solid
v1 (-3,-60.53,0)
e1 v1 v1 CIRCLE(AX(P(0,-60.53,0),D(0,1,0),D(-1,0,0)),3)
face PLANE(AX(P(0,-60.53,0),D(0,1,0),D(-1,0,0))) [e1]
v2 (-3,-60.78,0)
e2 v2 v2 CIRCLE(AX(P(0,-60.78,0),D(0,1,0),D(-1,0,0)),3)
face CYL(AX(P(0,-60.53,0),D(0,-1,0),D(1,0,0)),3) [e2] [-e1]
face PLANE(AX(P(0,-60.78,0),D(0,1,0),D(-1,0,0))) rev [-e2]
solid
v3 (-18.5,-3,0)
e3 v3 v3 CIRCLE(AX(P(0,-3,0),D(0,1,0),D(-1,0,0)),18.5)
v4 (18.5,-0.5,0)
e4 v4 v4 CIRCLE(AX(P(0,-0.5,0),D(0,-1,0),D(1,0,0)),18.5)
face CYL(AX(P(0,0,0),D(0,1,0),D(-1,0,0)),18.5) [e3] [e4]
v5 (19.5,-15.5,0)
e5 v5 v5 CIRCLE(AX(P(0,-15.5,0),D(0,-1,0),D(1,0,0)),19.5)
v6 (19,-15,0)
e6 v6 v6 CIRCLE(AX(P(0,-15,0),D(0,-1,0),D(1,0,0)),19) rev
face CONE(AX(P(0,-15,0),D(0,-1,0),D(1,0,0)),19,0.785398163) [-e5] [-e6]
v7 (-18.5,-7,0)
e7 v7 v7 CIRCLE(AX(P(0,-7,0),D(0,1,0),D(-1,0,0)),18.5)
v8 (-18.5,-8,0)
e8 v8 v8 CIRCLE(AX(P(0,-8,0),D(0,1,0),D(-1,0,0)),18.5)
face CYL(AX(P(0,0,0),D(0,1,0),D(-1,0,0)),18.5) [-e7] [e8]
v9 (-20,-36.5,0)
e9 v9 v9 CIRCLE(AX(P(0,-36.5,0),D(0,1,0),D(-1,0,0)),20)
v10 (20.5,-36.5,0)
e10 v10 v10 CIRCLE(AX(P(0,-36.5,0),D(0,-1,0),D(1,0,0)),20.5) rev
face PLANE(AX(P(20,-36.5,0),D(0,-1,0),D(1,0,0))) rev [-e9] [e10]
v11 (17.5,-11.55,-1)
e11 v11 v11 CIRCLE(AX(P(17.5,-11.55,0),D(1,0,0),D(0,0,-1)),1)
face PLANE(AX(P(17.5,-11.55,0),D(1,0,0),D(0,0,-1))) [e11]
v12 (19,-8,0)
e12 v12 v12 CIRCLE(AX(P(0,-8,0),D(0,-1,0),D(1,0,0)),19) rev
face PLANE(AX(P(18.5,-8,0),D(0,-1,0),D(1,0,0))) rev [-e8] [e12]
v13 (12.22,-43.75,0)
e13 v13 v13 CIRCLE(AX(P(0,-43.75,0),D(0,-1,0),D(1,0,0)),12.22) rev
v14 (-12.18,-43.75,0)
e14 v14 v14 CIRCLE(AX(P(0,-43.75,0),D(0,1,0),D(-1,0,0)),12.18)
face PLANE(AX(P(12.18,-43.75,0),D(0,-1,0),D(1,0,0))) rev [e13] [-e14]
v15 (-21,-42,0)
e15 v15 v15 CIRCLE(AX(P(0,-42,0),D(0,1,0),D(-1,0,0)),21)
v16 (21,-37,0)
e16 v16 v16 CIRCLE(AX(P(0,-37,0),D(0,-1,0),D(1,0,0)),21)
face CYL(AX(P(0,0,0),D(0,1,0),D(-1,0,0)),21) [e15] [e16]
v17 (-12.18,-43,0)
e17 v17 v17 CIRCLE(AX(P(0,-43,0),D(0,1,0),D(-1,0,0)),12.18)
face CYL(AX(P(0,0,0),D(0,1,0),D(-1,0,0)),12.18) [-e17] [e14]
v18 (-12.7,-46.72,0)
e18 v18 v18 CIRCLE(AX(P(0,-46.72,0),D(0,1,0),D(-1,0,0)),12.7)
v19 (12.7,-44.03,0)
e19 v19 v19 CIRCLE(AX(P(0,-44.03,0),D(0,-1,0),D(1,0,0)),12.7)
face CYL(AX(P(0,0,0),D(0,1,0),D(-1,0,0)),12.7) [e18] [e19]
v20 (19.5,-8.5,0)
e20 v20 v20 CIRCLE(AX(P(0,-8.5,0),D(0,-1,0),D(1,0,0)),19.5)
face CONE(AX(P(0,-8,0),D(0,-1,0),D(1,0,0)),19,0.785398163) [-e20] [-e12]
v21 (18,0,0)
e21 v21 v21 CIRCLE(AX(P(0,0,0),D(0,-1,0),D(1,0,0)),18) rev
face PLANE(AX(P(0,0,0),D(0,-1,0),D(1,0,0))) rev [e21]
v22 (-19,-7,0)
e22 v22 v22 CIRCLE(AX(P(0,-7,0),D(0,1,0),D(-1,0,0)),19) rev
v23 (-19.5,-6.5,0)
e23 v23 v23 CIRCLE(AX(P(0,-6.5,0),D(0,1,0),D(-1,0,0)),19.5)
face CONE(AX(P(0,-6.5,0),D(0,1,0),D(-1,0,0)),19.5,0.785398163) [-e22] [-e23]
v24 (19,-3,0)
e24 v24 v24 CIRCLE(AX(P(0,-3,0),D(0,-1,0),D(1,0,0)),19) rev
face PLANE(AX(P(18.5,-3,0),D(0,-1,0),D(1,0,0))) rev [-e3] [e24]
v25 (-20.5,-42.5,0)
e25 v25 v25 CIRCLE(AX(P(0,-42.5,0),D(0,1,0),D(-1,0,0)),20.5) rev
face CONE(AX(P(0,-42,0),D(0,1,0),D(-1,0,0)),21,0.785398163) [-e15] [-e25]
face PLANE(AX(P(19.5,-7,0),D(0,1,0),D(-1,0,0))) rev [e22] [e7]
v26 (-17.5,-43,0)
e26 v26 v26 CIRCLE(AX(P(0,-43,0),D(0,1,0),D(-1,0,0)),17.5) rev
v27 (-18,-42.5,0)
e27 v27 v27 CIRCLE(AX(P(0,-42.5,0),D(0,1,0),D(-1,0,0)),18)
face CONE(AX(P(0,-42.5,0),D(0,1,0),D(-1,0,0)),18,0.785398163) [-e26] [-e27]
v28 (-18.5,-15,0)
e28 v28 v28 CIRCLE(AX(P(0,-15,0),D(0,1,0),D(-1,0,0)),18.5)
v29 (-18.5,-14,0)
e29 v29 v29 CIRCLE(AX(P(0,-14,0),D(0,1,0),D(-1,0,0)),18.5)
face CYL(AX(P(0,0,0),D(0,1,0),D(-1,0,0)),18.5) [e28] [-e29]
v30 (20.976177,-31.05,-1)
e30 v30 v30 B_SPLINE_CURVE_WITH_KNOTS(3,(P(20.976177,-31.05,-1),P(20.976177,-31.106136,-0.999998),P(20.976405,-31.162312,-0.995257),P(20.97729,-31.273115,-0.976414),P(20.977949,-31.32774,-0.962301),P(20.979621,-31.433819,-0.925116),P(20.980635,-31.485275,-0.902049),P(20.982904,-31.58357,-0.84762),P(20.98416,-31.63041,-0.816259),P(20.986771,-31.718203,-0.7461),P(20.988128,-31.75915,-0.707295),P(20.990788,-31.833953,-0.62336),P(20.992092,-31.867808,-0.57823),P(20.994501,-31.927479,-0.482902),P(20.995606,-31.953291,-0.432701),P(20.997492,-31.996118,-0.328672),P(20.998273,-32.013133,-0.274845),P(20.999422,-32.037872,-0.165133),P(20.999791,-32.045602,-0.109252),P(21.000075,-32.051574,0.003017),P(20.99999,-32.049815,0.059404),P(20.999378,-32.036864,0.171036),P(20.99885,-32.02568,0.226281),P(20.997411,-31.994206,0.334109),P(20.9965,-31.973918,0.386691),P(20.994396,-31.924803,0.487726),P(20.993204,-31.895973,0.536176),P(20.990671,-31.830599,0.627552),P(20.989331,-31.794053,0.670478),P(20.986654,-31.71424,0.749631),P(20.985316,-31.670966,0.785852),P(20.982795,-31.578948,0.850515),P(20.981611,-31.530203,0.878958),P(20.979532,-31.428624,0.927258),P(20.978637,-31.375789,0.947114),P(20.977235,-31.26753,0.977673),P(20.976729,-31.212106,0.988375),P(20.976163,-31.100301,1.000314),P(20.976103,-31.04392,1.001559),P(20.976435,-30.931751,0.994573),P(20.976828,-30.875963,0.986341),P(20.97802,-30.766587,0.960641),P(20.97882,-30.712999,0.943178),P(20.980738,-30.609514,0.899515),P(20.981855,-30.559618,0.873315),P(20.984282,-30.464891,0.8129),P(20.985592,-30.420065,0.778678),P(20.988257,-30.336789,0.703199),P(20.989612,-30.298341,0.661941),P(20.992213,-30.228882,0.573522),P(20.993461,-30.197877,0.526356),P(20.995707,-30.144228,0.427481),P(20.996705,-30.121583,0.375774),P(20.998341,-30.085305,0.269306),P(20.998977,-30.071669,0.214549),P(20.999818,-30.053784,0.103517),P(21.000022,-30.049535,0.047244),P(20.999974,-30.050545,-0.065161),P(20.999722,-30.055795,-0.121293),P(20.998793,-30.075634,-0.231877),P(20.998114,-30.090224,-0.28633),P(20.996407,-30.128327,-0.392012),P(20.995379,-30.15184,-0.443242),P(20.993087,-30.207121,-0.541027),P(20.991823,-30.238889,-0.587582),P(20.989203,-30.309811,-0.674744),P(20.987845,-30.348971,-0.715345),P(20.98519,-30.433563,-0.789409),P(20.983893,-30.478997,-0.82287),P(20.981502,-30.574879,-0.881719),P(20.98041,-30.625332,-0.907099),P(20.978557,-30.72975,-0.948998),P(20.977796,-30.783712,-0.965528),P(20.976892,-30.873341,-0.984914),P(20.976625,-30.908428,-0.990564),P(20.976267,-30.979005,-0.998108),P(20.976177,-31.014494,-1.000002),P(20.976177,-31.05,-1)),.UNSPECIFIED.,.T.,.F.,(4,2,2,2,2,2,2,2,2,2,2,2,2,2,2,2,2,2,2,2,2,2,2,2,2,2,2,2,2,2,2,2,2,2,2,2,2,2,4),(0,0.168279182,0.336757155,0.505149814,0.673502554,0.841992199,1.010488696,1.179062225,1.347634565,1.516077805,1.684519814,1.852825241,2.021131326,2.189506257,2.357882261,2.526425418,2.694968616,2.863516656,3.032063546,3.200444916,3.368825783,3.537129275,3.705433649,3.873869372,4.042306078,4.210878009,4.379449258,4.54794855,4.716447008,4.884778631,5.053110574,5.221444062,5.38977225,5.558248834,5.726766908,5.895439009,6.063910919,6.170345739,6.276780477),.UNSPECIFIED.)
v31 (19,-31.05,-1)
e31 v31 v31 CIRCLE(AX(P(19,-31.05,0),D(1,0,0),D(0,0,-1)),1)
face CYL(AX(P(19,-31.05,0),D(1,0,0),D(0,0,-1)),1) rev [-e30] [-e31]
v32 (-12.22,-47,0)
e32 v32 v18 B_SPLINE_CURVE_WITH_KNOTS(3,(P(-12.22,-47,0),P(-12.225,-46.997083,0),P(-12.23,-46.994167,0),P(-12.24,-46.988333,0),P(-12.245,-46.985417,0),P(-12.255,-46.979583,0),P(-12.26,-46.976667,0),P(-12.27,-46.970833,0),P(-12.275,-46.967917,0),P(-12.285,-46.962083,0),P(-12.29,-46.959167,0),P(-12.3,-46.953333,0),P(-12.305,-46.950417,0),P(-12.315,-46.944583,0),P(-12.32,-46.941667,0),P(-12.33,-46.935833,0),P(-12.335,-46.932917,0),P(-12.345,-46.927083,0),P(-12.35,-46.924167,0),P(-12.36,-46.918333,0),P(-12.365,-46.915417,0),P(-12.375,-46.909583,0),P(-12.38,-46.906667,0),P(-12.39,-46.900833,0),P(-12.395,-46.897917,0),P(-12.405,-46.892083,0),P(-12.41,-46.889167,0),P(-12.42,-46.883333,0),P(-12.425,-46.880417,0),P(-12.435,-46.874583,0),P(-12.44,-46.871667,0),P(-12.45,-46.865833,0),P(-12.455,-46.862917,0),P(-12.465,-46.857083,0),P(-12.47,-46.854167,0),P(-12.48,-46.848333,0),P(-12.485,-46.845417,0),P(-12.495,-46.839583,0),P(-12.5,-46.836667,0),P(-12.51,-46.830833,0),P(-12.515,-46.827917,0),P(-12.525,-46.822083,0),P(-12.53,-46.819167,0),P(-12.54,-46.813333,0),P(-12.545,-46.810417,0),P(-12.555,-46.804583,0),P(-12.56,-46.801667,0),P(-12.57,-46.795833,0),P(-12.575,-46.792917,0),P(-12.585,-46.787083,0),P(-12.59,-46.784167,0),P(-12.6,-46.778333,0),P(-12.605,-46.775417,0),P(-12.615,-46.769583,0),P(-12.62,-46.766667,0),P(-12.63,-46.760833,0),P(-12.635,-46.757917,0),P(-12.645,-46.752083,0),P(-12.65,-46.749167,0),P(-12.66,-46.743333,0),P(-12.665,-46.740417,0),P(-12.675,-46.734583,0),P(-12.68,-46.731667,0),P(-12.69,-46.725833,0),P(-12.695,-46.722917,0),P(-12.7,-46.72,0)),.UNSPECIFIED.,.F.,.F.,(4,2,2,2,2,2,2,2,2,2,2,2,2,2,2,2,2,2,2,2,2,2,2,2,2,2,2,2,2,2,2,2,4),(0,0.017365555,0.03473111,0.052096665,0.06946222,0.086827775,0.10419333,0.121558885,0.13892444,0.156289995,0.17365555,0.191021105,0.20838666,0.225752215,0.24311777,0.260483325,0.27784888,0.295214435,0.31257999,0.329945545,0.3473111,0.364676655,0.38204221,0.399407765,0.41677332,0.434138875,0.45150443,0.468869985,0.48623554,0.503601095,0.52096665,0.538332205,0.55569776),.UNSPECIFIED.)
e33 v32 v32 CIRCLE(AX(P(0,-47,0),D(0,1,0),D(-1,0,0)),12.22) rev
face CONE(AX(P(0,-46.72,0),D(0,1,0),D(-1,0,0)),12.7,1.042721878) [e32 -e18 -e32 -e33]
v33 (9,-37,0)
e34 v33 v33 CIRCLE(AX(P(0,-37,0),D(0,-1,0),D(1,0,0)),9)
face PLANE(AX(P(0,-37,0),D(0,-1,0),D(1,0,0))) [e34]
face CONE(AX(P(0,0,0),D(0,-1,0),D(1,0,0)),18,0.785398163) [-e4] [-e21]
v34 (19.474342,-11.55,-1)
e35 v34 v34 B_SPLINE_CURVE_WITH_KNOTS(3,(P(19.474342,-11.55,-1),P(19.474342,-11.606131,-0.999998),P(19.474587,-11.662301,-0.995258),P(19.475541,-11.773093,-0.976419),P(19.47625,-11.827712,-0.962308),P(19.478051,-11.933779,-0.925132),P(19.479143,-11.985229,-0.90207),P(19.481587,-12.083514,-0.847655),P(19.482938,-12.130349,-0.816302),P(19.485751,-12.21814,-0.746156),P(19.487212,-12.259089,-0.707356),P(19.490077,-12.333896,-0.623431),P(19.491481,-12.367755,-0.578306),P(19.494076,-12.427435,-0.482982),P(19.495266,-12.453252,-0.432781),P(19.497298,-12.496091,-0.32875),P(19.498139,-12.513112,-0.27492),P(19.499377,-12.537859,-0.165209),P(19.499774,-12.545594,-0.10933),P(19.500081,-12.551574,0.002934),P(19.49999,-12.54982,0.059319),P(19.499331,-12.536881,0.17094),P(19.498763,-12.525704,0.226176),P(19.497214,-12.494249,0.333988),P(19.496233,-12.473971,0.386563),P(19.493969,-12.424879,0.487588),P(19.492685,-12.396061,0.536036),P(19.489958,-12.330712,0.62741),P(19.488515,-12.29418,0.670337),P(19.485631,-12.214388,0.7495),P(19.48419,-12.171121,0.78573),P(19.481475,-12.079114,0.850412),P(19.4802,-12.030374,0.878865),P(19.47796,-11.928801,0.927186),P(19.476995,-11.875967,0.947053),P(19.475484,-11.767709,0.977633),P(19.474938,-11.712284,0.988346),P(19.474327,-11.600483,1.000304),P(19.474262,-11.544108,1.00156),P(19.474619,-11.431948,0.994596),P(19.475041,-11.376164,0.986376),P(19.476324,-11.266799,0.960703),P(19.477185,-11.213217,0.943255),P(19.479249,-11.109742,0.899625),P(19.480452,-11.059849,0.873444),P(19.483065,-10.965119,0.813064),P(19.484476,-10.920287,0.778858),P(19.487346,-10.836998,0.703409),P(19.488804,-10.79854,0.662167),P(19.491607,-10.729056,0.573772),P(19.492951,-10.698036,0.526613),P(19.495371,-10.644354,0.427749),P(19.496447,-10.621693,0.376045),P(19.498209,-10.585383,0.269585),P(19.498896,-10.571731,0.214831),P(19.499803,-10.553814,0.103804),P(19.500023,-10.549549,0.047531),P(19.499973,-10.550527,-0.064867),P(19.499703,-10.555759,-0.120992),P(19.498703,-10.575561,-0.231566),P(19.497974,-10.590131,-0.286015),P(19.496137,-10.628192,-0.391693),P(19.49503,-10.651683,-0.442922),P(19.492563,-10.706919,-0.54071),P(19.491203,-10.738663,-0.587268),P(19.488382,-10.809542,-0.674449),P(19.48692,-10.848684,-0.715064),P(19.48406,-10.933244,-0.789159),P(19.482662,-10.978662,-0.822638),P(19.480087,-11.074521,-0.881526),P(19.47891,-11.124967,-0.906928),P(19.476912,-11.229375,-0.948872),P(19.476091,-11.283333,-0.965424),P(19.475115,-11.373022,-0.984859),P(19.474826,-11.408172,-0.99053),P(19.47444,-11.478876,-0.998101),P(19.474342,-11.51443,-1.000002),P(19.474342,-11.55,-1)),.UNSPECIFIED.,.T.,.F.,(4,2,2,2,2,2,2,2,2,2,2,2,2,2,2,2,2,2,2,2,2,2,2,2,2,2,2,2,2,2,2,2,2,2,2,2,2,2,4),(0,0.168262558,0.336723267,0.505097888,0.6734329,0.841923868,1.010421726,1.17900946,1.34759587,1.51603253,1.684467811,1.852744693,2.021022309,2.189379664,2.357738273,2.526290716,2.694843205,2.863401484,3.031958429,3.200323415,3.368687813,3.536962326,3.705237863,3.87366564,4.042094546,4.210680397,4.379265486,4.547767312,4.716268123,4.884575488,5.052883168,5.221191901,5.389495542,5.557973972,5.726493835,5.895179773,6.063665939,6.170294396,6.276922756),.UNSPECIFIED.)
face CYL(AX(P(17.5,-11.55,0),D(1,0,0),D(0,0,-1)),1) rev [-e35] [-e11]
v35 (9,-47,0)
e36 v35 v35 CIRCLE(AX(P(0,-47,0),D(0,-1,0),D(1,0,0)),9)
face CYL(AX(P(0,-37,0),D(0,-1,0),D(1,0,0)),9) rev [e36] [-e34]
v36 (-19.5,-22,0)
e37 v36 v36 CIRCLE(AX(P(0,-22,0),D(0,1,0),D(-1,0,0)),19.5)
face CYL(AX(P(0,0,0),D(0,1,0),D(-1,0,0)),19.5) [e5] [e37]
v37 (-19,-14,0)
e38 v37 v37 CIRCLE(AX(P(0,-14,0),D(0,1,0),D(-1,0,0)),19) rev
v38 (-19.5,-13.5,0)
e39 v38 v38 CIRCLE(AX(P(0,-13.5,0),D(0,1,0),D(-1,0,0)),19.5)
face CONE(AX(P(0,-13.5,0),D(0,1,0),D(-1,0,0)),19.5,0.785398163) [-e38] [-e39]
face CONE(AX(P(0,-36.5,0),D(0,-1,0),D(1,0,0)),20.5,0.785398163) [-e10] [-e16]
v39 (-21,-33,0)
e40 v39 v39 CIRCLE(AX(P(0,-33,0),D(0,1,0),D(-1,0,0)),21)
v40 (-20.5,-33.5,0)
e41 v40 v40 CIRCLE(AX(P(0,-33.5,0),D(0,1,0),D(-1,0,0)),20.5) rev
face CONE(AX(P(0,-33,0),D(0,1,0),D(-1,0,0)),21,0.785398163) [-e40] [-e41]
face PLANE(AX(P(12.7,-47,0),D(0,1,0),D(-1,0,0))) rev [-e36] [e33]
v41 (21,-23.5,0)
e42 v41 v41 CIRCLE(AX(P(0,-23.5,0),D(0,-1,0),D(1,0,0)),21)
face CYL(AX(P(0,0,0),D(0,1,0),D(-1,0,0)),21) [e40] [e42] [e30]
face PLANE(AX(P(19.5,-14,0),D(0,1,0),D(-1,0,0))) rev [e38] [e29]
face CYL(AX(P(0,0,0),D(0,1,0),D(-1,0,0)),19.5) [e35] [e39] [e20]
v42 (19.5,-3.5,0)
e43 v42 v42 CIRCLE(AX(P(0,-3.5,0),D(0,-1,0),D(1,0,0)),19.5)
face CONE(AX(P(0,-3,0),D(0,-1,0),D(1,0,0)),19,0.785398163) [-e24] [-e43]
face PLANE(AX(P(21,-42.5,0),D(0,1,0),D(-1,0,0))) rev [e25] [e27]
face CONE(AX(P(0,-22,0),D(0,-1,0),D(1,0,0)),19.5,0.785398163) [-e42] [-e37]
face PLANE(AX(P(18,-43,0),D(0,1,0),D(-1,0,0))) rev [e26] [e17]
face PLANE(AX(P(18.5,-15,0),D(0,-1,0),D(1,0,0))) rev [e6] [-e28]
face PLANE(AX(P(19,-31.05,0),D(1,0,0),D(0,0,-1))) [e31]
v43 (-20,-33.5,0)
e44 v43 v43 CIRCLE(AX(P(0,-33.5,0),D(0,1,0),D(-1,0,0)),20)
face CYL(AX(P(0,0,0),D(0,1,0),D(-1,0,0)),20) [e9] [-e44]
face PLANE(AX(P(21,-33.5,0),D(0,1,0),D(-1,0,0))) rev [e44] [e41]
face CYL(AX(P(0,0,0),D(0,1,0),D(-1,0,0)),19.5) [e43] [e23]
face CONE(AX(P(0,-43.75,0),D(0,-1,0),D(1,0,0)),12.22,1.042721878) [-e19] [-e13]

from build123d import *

# Parameters (mm, degrees)
F_5MM_BODY_CHAMFERS_SIZE           = 0.5
F_1_5MM_BODY_CHAMFERS_SIZE         = 1.5
F_48MM_X_28MM_BODY_CHAMFER_1_SIZE  = 0.28
F_48MM_X_28MM_BODY_CHAMFER_1_SIZE2 = 0.48
F_48MM_X_28MM_BODY_CHAMFER_2_SIZE  = 0.48
F_48MM_X_28MM_BODY_CHAMFER_2_SIZE2 = 0.28
SKETCH2_R                          = 9
SENSOR_HOLE_DEPTH                  = 10
SKETCH9_R                          = 3
FOCAL_POINT_DEPTH                  = 0.25
SKETCH10_R                         = 1
CUT_EXTRUDE1_DEPTH                 = 2
SKETCH11_R                         = 1
CUT_EXTRUDE2_DEPTH                 = 2


with BuildPart() as part:
    # Sketch1 → Lens Body (revolve)
    with BuildSketch(Plane.XY, mode=Mode.PRIVATE) as lens_body_sk:
        Polygon((0, 0), (18.5, 0), (18.5, -3), (19.5, -3), (19.5, -7), (18.5, -7), (18.5, -8), (19.5, -8), (19.5, -14), (18.5, -14), (18.5, -15), (19.5, -15), (19.5, -22), (21, -22), (21, -33.5), (20, -33.5), (20, -36.5), (21, -36.5), (21, -42.5), (18, -42.5), (18, -43), (12.18, -43), (12.18, -43.75), (12.7, -43.75), (12.7, -47), (0, -47), align=None)
    revolve(lens_body_sk.sketch.rotate(Axis((0, 0, 0), (0, -1, 0)), 180), axis=Axis((0, 0, 0), (0, -1, 0)))

    # .5mm Body Chamfers
    f_5mm_body_chamfers_edges = [part.edges().sort_by_distance(p)[0] for p in [
        (18, -43, 0),
        (21, -42.5, 0),
        (21, -36.5, 0),
        (21, -33.5, 0),
        (19.5, -15, 0),
        (19.5, -14, 0),
        (19.5, -8, 0),
        (19.5, -7, 0),
        (19.5, -3, 0),
        (18.5, 0, 0),
    ]]
    chamfer(f_5mm_body_chamfers_edges, length=F_5MM_BODY_CHAMFERS_SIZE - 0.0001)  # a hair under: the kernel refuses the full size

    # 1.5mm Body Chamfers
    f_1_5mm_body_chamfers_edges = [part.edges().sort_by_distance(p)[0] for p in [
        (21, -22, 0),
    ]]
    chamfer(f_1_5mm_body_chamfers_edges, length=F_1_5MM_BODY_CHAMFERS_SIZE - 0.0001)  # a hair under: the kernel refuses the full size

    # .48mm x .28mm Body Chamfer 1
    f_48mm_x_28mm_body_chamfer_1_edges = [part.edges().sort_by_distance(p)[0] for p in [
        (12.7, -43.75, 0),
    ]]
    f_48mm_x_28mm_body_chamfer_1_side = [part.faces().sort_by_distance(p)[0] for p in [
        (12.7, -45.375, 0),
    ]]
    chamfer(f_48mm_x_28mm_body_chamfer_1_edges, length=F_48MM_X_28MM_BODY_CHAMFER_1_SIZE, length2=F_48MM_X_28MM_BODY_CHAMFER_1_SIZE2, reference=f_48mm_x_28mm_body_chamfer_1_side[0])

    # .48mm x .28mm Body Chamfer 2
    f_48mm_x_28mm_body_chamfer_2_edges = [part.edges().sort_by_distance(p)[0] for p in [
        (12.7, -47, 0),
    ]]
    f_48mm_x_28mm_body_chamfer_2_side = [part.faces().sort_by_distance(p)[0] for p in [
        (0, -47, 0),
    ]]
    chamfer(f_48mm_x_28mm_body_chamfer_2_edges, length=F_48MM_X_28MM_BODY_CHAMFER_2_SIZE, length2=F_48MM_X_28MM_BODY_CHAMFER_2_SIZE2, reference=f_48mm_x_28mm_body_chamfer_2_side[0])

    # Sketch2 → Sensor Hole (cut)
    with BuildSketch(Plane.XZ.offset(47)):
        Circle(SKETCH2_R)
    extrude(amount=-SENSOR_HOLE_DEPTH, mode=Mode.SUBTRACT)

    # Sketch10 → Cut-Extrude1 (cut)
    with BuildSketch(Plane(origin=(21, 0, 0), x_dir=(0, 0, -1), z_dir=(1, 0, 0))):
        with Locations((0, -31.05)):
            Circle(SKETCH10_R)
    extrude(amount=-CUT_EXTRUDE1_DEPTH, mode=Mode.SUBTRACT)

    # Sketch11 → Cut-Extrude2 (cut)
    with BuildSketch(Plane(origin=(19.5, 0, 0), x_dir=(0, 0, -1), z_dir=(1, 0, 0))):
        with Locations((0, -11.55)):
            Circle(SKETCH11_R)
    extrude(amount=-CUT_EXTRUDE2_DEPTH, mode=Mode.SUBTRACT)


with BuildPart() as body_2:
    # Sketch9 → Focal Point (new body)
    with BuildSketch(Plane(origin=(0, -60.78, 0), x_dir=(1, 0, 0), z_dir=(0, 1, 0))):
        with Locations(Location((0, 0, 0), (0, 0, 180))):
            Circle(SKETCH9_R)
    extrude(amount=FOCAL_POINT_DEPTH)


solid = Compound([part.part, body_2.part])
